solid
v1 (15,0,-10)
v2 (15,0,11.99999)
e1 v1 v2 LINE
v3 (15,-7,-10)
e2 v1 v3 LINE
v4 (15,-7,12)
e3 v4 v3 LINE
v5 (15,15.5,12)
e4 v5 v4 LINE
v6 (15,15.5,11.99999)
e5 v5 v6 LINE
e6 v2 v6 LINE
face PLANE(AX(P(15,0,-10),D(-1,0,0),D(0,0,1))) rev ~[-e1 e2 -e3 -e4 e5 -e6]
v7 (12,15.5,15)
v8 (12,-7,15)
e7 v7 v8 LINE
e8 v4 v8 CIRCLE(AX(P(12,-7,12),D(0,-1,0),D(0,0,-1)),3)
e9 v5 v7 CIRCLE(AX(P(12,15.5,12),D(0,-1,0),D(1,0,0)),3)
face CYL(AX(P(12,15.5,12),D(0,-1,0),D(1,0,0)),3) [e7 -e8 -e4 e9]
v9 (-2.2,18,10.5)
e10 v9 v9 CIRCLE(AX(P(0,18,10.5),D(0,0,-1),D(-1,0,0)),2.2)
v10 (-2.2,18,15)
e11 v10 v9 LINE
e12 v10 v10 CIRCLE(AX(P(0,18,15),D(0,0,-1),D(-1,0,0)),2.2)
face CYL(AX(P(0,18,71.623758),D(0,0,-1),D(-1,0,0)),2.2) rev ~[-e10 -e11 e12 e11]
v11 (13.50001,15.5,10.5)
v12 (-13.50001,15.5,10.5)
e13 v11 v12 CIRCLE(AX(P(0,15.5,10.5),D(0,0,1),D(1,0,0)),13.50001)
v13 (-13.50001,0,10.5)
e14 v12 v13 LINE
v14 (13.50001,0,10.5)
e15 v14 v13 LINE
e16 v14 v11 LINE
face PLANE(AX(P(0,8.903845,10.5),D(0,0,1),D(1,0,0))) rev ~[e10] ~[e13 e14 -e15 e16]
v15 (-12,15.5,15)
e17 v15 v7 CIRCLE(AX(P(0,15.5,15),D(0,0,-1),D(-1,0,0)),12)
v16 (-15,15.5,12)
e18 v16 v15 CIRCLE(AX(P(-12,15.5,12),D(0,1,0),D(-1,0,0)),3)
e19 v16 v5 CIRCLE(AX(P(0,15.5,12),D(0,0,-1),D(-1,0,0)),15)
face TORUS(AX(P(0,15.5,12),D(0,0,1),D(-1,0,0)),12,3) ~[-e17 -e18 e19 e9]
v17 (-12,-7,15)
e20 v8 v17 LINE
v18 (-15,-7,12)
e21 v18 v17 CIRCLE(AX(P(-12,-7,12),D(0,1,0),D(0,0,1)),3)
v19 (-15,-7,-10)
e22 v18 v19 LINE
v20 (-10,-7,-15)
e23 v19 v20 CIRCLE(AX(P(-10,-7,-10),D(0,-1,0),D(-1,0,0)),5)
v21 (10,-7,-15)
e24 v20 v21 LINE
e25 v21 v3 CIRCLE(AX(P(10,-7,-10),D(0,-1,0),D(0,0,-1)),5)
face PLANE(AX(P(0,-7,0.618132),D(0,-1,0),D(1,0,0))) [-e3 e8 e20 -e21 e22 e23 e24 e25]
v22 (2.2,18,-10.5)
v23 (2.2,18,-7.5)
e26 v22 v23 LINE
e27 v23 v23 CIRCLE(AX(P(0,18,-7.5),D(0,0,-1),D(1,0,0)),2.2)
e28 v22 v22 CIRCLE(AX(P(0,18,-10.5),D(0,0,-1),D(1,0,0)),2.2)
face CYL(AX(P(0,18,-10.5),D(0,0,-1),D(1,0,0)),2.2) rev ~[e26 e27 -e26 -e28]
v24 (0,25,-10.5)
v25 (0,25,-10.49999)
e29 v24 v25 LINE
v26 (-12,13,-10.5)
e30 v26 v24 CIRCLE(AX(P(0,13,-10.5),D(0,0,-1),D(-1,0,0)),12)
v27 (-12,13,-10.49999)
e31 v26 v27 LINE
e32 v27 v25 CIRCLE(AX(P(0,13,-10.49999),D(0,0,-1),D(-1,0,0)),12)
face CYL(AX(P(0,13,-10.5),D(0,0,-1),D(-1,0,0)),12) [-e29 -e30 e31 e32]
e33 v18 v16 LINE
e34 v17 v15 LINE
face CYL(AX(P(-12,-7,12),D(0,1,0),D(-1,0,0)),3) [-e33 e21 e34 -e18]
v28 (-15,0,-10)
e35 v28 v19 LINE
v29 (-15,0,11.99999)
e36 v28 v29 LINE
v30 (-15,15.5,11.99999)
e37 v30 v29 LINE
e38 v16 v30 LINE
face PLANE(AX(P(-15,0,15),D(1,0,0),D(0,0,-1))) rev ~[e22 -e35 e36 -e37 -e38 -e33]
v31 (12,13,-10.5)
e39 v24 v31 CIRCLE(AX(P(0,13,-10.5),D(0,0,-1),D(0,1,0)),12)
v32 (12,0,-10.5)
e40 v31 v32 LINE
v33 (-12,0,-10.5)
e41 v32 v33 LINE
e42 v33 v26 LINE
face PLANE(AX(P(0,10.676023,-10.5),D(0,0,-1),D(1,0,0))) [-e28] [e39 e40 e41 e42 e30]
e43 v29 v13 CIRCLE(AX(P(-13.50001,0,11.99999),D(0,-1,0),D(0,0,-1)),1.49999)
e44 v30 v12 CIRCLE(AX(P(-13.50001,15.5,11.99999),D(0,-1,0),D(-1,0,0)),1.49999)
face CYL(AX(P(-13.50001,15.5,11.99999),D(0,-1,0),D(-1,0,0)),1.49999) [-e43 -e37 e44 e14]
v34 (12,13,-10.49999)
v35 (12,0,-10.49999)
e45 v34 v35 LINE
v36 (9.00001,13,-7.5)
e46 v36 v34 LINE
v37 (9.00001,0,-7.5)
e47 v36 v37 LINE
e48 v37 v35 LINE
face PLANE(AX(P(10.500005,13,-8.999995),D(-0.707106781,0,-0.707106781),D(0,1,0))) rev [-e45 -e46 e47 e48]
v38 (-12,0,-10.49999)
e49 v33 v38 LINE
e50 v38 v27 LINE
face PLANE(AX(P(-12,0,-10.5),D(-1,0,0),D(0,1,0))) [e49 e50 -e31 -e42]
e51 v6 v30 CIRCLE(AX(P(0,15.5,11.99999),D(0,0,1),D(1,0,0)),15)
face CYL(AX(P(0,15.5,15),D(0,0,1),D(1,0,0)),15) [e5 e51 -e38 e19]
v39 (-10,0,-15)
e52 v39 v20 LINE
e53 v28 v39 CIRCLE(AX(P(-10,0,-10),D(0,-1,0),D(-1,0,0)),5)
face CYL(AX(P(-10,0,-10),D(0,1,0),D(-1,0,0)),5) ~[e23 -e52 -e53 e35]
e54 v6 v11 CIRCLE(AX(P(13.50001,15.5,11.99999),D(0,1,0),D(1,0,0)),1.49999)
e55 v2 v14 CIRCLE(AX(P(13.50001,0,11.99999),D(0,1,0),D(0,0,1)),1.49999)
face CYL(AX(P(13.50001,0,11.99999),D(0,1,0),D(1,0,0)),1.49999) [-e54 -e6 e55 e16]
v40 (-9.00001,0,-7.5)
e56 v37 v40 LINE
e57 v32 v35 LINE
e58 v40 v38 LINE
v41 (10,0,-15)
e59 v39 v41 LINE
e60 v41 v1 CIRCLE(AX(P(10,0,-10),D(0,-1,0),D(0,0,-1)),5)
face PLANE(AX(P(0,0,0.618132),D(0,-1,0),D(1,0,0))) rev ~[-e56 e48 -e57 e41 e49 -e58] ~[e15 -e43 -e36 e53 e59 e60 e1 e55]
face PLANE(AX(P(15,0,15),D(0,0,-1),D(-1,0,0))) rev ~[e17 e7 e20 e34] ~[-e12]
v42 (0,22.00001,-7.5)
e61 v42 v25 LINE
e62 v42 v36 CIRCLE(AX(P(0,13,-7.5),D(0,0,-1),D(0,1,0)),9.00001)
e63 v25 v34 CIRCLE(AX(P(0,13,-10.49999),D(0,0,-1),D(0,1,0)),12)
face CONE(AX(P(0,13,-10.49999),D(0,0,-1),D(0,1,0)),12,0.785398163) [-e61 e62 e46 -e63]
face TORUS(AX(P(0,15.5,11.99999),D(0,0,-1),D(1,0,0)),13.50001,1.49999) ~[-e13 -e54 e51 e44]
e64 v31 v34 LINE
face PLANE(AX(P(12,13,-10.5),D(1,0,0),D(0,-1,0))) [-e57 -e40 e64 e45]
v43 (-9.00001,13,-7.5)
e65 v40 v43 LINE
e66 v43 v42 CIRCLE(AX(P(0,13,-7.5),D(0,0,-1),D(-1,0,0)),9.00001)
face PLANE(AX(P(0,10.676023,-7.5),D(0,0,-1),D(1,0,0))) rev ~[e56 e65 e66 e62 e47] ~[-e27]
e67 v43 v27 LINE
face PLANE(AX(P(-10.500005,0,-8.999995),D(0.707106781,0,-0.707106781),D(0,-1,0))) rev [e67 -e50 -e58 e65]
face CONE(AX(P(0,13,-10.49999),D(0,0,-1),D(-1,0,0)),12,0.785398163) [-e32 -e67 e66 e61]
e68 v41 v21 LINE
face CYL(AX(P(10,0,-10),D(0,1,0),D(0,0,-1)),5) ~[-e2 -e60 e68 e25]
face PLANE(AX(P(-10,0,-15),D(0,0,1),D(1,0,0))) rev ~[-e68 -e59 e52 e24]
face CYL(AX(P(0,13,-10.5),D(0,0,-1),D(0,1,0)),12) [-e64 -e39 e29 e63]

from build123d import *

# Parameters (mm, degrees)
F1_DEPTH  = 7
F3_DEPTH  = 4.5
F4_R      = 3
F5_R      = 1.49999
F7_D      = 4.4
F10_DEPTH = 3
F11_R     = 2.2
F12_DEPTH = 3
F13_SIZE  = 2.99999


# Not quite as in the source:
# - a fillet or chamfer is up to 0.001 mm smaller than in the source, because OpenCascade refuses the exact size


with BuildPart() as f1:
    # F0 (on Front) → F1 (new body)
    with BuildSketch(Plane.XZ):
        with BuildLine():
            Line((15, -10), (15, 15))
            Line((15, 15), (-15, 15))
            Line((-15, 15), (-15, -10))
            ThreePointArc((-15, -10), (-13.5355339059, -13.5355339059), (-10, -15))
            Line((-10, -15), (10, -15))
            ThreePointArc((10, -15), (13.5355339059, -13.5355339059), (15, -10))
        make_face()
    extrude(amount=F1_DEPTH)

    # F2 (on face) → F3 (join)
    with BuildSketch(Plane.XY.offset(15)):
        with BuildLine():
            Line((-15, 0), (-15, -7))
            Line((-15, -7), (15, -7))
            Line((15, -7), (15, 0))
            Line((15, 0), (15, 15.5))
            ThreePointArc((15, 15.5), (10.6066017178, 26.1066017178), (0, 30.5))
            ThreePointArc((0, 30.5), (-10.6066017178, 26.1066017178), (-15, 15.5))
            Line((-15, 15.5), (-15, 0))
        make_face()
    extrude(amount=-F3_DEPTH)

    # F4
    f4_edges = [f1.edges().sort_by_distance(p)[0] for p in [
        (15, 4.25, 15),
    ]]
    fillet(f4_edges, radius=F4_R)

    # F5 (radius 1.5 in the source; OpenCascade refuses exactly that, so slightly less here)
    f5_edges = [f1.edges().sort_by_distance(p)[0] for p in [
        (15, 7.75, 10.5),
    ]]
    fillet(f5_edges, radius=F5_R)

    # F7 (through all)
    with Locations(Plane.XY.offset(15)):
        with Locations((0, 18)):
            Hole(F7_D / 2)

    # F9 (on offset) → F10 (join)
    with BuildSketch(Plane(origin=(0, 0, -10.5), x_dir=(1, 0, 0), z_dir=(0, 0, -1))):
        with BuildLine():
            Line((12, 0), (-12, 0))
            Line((-12, 0), (-12, -13))
            ThreePointArc((-12, -13), (-8.4852813742, -21.4852813742), (0, -25))
            ThreePointArc((0, -25), (8.4852813742, -21.4852813742), (12, -13))
            Line((12, -13), (12, 0))
        make_face()
    extrude(amount=-F10_DEPTH)

    # F11 (on face) → F12 (cut)
    with BuildSketch(Plane(origin=(0, 0, -10.5), x_dir=(1, 0, 0), z_dir=(0, 0, -1))):
        with Locations((0, -18)):
            Circle(F11_R)
    extrude(amount=-F12_DEPTH, mode=Mode.SUBTRACT)

    # F13 (size 3 in the source; OpenCascade refuses exactly that, so slightly less here)
    f13_edges = [f1.edges().sort_by_distance(p)[0] for p in [
        (-12, 6.5, -7.5),
    ]]
    chamfer(f13_edges, length=F13_SIZE)


solid = f1.part
